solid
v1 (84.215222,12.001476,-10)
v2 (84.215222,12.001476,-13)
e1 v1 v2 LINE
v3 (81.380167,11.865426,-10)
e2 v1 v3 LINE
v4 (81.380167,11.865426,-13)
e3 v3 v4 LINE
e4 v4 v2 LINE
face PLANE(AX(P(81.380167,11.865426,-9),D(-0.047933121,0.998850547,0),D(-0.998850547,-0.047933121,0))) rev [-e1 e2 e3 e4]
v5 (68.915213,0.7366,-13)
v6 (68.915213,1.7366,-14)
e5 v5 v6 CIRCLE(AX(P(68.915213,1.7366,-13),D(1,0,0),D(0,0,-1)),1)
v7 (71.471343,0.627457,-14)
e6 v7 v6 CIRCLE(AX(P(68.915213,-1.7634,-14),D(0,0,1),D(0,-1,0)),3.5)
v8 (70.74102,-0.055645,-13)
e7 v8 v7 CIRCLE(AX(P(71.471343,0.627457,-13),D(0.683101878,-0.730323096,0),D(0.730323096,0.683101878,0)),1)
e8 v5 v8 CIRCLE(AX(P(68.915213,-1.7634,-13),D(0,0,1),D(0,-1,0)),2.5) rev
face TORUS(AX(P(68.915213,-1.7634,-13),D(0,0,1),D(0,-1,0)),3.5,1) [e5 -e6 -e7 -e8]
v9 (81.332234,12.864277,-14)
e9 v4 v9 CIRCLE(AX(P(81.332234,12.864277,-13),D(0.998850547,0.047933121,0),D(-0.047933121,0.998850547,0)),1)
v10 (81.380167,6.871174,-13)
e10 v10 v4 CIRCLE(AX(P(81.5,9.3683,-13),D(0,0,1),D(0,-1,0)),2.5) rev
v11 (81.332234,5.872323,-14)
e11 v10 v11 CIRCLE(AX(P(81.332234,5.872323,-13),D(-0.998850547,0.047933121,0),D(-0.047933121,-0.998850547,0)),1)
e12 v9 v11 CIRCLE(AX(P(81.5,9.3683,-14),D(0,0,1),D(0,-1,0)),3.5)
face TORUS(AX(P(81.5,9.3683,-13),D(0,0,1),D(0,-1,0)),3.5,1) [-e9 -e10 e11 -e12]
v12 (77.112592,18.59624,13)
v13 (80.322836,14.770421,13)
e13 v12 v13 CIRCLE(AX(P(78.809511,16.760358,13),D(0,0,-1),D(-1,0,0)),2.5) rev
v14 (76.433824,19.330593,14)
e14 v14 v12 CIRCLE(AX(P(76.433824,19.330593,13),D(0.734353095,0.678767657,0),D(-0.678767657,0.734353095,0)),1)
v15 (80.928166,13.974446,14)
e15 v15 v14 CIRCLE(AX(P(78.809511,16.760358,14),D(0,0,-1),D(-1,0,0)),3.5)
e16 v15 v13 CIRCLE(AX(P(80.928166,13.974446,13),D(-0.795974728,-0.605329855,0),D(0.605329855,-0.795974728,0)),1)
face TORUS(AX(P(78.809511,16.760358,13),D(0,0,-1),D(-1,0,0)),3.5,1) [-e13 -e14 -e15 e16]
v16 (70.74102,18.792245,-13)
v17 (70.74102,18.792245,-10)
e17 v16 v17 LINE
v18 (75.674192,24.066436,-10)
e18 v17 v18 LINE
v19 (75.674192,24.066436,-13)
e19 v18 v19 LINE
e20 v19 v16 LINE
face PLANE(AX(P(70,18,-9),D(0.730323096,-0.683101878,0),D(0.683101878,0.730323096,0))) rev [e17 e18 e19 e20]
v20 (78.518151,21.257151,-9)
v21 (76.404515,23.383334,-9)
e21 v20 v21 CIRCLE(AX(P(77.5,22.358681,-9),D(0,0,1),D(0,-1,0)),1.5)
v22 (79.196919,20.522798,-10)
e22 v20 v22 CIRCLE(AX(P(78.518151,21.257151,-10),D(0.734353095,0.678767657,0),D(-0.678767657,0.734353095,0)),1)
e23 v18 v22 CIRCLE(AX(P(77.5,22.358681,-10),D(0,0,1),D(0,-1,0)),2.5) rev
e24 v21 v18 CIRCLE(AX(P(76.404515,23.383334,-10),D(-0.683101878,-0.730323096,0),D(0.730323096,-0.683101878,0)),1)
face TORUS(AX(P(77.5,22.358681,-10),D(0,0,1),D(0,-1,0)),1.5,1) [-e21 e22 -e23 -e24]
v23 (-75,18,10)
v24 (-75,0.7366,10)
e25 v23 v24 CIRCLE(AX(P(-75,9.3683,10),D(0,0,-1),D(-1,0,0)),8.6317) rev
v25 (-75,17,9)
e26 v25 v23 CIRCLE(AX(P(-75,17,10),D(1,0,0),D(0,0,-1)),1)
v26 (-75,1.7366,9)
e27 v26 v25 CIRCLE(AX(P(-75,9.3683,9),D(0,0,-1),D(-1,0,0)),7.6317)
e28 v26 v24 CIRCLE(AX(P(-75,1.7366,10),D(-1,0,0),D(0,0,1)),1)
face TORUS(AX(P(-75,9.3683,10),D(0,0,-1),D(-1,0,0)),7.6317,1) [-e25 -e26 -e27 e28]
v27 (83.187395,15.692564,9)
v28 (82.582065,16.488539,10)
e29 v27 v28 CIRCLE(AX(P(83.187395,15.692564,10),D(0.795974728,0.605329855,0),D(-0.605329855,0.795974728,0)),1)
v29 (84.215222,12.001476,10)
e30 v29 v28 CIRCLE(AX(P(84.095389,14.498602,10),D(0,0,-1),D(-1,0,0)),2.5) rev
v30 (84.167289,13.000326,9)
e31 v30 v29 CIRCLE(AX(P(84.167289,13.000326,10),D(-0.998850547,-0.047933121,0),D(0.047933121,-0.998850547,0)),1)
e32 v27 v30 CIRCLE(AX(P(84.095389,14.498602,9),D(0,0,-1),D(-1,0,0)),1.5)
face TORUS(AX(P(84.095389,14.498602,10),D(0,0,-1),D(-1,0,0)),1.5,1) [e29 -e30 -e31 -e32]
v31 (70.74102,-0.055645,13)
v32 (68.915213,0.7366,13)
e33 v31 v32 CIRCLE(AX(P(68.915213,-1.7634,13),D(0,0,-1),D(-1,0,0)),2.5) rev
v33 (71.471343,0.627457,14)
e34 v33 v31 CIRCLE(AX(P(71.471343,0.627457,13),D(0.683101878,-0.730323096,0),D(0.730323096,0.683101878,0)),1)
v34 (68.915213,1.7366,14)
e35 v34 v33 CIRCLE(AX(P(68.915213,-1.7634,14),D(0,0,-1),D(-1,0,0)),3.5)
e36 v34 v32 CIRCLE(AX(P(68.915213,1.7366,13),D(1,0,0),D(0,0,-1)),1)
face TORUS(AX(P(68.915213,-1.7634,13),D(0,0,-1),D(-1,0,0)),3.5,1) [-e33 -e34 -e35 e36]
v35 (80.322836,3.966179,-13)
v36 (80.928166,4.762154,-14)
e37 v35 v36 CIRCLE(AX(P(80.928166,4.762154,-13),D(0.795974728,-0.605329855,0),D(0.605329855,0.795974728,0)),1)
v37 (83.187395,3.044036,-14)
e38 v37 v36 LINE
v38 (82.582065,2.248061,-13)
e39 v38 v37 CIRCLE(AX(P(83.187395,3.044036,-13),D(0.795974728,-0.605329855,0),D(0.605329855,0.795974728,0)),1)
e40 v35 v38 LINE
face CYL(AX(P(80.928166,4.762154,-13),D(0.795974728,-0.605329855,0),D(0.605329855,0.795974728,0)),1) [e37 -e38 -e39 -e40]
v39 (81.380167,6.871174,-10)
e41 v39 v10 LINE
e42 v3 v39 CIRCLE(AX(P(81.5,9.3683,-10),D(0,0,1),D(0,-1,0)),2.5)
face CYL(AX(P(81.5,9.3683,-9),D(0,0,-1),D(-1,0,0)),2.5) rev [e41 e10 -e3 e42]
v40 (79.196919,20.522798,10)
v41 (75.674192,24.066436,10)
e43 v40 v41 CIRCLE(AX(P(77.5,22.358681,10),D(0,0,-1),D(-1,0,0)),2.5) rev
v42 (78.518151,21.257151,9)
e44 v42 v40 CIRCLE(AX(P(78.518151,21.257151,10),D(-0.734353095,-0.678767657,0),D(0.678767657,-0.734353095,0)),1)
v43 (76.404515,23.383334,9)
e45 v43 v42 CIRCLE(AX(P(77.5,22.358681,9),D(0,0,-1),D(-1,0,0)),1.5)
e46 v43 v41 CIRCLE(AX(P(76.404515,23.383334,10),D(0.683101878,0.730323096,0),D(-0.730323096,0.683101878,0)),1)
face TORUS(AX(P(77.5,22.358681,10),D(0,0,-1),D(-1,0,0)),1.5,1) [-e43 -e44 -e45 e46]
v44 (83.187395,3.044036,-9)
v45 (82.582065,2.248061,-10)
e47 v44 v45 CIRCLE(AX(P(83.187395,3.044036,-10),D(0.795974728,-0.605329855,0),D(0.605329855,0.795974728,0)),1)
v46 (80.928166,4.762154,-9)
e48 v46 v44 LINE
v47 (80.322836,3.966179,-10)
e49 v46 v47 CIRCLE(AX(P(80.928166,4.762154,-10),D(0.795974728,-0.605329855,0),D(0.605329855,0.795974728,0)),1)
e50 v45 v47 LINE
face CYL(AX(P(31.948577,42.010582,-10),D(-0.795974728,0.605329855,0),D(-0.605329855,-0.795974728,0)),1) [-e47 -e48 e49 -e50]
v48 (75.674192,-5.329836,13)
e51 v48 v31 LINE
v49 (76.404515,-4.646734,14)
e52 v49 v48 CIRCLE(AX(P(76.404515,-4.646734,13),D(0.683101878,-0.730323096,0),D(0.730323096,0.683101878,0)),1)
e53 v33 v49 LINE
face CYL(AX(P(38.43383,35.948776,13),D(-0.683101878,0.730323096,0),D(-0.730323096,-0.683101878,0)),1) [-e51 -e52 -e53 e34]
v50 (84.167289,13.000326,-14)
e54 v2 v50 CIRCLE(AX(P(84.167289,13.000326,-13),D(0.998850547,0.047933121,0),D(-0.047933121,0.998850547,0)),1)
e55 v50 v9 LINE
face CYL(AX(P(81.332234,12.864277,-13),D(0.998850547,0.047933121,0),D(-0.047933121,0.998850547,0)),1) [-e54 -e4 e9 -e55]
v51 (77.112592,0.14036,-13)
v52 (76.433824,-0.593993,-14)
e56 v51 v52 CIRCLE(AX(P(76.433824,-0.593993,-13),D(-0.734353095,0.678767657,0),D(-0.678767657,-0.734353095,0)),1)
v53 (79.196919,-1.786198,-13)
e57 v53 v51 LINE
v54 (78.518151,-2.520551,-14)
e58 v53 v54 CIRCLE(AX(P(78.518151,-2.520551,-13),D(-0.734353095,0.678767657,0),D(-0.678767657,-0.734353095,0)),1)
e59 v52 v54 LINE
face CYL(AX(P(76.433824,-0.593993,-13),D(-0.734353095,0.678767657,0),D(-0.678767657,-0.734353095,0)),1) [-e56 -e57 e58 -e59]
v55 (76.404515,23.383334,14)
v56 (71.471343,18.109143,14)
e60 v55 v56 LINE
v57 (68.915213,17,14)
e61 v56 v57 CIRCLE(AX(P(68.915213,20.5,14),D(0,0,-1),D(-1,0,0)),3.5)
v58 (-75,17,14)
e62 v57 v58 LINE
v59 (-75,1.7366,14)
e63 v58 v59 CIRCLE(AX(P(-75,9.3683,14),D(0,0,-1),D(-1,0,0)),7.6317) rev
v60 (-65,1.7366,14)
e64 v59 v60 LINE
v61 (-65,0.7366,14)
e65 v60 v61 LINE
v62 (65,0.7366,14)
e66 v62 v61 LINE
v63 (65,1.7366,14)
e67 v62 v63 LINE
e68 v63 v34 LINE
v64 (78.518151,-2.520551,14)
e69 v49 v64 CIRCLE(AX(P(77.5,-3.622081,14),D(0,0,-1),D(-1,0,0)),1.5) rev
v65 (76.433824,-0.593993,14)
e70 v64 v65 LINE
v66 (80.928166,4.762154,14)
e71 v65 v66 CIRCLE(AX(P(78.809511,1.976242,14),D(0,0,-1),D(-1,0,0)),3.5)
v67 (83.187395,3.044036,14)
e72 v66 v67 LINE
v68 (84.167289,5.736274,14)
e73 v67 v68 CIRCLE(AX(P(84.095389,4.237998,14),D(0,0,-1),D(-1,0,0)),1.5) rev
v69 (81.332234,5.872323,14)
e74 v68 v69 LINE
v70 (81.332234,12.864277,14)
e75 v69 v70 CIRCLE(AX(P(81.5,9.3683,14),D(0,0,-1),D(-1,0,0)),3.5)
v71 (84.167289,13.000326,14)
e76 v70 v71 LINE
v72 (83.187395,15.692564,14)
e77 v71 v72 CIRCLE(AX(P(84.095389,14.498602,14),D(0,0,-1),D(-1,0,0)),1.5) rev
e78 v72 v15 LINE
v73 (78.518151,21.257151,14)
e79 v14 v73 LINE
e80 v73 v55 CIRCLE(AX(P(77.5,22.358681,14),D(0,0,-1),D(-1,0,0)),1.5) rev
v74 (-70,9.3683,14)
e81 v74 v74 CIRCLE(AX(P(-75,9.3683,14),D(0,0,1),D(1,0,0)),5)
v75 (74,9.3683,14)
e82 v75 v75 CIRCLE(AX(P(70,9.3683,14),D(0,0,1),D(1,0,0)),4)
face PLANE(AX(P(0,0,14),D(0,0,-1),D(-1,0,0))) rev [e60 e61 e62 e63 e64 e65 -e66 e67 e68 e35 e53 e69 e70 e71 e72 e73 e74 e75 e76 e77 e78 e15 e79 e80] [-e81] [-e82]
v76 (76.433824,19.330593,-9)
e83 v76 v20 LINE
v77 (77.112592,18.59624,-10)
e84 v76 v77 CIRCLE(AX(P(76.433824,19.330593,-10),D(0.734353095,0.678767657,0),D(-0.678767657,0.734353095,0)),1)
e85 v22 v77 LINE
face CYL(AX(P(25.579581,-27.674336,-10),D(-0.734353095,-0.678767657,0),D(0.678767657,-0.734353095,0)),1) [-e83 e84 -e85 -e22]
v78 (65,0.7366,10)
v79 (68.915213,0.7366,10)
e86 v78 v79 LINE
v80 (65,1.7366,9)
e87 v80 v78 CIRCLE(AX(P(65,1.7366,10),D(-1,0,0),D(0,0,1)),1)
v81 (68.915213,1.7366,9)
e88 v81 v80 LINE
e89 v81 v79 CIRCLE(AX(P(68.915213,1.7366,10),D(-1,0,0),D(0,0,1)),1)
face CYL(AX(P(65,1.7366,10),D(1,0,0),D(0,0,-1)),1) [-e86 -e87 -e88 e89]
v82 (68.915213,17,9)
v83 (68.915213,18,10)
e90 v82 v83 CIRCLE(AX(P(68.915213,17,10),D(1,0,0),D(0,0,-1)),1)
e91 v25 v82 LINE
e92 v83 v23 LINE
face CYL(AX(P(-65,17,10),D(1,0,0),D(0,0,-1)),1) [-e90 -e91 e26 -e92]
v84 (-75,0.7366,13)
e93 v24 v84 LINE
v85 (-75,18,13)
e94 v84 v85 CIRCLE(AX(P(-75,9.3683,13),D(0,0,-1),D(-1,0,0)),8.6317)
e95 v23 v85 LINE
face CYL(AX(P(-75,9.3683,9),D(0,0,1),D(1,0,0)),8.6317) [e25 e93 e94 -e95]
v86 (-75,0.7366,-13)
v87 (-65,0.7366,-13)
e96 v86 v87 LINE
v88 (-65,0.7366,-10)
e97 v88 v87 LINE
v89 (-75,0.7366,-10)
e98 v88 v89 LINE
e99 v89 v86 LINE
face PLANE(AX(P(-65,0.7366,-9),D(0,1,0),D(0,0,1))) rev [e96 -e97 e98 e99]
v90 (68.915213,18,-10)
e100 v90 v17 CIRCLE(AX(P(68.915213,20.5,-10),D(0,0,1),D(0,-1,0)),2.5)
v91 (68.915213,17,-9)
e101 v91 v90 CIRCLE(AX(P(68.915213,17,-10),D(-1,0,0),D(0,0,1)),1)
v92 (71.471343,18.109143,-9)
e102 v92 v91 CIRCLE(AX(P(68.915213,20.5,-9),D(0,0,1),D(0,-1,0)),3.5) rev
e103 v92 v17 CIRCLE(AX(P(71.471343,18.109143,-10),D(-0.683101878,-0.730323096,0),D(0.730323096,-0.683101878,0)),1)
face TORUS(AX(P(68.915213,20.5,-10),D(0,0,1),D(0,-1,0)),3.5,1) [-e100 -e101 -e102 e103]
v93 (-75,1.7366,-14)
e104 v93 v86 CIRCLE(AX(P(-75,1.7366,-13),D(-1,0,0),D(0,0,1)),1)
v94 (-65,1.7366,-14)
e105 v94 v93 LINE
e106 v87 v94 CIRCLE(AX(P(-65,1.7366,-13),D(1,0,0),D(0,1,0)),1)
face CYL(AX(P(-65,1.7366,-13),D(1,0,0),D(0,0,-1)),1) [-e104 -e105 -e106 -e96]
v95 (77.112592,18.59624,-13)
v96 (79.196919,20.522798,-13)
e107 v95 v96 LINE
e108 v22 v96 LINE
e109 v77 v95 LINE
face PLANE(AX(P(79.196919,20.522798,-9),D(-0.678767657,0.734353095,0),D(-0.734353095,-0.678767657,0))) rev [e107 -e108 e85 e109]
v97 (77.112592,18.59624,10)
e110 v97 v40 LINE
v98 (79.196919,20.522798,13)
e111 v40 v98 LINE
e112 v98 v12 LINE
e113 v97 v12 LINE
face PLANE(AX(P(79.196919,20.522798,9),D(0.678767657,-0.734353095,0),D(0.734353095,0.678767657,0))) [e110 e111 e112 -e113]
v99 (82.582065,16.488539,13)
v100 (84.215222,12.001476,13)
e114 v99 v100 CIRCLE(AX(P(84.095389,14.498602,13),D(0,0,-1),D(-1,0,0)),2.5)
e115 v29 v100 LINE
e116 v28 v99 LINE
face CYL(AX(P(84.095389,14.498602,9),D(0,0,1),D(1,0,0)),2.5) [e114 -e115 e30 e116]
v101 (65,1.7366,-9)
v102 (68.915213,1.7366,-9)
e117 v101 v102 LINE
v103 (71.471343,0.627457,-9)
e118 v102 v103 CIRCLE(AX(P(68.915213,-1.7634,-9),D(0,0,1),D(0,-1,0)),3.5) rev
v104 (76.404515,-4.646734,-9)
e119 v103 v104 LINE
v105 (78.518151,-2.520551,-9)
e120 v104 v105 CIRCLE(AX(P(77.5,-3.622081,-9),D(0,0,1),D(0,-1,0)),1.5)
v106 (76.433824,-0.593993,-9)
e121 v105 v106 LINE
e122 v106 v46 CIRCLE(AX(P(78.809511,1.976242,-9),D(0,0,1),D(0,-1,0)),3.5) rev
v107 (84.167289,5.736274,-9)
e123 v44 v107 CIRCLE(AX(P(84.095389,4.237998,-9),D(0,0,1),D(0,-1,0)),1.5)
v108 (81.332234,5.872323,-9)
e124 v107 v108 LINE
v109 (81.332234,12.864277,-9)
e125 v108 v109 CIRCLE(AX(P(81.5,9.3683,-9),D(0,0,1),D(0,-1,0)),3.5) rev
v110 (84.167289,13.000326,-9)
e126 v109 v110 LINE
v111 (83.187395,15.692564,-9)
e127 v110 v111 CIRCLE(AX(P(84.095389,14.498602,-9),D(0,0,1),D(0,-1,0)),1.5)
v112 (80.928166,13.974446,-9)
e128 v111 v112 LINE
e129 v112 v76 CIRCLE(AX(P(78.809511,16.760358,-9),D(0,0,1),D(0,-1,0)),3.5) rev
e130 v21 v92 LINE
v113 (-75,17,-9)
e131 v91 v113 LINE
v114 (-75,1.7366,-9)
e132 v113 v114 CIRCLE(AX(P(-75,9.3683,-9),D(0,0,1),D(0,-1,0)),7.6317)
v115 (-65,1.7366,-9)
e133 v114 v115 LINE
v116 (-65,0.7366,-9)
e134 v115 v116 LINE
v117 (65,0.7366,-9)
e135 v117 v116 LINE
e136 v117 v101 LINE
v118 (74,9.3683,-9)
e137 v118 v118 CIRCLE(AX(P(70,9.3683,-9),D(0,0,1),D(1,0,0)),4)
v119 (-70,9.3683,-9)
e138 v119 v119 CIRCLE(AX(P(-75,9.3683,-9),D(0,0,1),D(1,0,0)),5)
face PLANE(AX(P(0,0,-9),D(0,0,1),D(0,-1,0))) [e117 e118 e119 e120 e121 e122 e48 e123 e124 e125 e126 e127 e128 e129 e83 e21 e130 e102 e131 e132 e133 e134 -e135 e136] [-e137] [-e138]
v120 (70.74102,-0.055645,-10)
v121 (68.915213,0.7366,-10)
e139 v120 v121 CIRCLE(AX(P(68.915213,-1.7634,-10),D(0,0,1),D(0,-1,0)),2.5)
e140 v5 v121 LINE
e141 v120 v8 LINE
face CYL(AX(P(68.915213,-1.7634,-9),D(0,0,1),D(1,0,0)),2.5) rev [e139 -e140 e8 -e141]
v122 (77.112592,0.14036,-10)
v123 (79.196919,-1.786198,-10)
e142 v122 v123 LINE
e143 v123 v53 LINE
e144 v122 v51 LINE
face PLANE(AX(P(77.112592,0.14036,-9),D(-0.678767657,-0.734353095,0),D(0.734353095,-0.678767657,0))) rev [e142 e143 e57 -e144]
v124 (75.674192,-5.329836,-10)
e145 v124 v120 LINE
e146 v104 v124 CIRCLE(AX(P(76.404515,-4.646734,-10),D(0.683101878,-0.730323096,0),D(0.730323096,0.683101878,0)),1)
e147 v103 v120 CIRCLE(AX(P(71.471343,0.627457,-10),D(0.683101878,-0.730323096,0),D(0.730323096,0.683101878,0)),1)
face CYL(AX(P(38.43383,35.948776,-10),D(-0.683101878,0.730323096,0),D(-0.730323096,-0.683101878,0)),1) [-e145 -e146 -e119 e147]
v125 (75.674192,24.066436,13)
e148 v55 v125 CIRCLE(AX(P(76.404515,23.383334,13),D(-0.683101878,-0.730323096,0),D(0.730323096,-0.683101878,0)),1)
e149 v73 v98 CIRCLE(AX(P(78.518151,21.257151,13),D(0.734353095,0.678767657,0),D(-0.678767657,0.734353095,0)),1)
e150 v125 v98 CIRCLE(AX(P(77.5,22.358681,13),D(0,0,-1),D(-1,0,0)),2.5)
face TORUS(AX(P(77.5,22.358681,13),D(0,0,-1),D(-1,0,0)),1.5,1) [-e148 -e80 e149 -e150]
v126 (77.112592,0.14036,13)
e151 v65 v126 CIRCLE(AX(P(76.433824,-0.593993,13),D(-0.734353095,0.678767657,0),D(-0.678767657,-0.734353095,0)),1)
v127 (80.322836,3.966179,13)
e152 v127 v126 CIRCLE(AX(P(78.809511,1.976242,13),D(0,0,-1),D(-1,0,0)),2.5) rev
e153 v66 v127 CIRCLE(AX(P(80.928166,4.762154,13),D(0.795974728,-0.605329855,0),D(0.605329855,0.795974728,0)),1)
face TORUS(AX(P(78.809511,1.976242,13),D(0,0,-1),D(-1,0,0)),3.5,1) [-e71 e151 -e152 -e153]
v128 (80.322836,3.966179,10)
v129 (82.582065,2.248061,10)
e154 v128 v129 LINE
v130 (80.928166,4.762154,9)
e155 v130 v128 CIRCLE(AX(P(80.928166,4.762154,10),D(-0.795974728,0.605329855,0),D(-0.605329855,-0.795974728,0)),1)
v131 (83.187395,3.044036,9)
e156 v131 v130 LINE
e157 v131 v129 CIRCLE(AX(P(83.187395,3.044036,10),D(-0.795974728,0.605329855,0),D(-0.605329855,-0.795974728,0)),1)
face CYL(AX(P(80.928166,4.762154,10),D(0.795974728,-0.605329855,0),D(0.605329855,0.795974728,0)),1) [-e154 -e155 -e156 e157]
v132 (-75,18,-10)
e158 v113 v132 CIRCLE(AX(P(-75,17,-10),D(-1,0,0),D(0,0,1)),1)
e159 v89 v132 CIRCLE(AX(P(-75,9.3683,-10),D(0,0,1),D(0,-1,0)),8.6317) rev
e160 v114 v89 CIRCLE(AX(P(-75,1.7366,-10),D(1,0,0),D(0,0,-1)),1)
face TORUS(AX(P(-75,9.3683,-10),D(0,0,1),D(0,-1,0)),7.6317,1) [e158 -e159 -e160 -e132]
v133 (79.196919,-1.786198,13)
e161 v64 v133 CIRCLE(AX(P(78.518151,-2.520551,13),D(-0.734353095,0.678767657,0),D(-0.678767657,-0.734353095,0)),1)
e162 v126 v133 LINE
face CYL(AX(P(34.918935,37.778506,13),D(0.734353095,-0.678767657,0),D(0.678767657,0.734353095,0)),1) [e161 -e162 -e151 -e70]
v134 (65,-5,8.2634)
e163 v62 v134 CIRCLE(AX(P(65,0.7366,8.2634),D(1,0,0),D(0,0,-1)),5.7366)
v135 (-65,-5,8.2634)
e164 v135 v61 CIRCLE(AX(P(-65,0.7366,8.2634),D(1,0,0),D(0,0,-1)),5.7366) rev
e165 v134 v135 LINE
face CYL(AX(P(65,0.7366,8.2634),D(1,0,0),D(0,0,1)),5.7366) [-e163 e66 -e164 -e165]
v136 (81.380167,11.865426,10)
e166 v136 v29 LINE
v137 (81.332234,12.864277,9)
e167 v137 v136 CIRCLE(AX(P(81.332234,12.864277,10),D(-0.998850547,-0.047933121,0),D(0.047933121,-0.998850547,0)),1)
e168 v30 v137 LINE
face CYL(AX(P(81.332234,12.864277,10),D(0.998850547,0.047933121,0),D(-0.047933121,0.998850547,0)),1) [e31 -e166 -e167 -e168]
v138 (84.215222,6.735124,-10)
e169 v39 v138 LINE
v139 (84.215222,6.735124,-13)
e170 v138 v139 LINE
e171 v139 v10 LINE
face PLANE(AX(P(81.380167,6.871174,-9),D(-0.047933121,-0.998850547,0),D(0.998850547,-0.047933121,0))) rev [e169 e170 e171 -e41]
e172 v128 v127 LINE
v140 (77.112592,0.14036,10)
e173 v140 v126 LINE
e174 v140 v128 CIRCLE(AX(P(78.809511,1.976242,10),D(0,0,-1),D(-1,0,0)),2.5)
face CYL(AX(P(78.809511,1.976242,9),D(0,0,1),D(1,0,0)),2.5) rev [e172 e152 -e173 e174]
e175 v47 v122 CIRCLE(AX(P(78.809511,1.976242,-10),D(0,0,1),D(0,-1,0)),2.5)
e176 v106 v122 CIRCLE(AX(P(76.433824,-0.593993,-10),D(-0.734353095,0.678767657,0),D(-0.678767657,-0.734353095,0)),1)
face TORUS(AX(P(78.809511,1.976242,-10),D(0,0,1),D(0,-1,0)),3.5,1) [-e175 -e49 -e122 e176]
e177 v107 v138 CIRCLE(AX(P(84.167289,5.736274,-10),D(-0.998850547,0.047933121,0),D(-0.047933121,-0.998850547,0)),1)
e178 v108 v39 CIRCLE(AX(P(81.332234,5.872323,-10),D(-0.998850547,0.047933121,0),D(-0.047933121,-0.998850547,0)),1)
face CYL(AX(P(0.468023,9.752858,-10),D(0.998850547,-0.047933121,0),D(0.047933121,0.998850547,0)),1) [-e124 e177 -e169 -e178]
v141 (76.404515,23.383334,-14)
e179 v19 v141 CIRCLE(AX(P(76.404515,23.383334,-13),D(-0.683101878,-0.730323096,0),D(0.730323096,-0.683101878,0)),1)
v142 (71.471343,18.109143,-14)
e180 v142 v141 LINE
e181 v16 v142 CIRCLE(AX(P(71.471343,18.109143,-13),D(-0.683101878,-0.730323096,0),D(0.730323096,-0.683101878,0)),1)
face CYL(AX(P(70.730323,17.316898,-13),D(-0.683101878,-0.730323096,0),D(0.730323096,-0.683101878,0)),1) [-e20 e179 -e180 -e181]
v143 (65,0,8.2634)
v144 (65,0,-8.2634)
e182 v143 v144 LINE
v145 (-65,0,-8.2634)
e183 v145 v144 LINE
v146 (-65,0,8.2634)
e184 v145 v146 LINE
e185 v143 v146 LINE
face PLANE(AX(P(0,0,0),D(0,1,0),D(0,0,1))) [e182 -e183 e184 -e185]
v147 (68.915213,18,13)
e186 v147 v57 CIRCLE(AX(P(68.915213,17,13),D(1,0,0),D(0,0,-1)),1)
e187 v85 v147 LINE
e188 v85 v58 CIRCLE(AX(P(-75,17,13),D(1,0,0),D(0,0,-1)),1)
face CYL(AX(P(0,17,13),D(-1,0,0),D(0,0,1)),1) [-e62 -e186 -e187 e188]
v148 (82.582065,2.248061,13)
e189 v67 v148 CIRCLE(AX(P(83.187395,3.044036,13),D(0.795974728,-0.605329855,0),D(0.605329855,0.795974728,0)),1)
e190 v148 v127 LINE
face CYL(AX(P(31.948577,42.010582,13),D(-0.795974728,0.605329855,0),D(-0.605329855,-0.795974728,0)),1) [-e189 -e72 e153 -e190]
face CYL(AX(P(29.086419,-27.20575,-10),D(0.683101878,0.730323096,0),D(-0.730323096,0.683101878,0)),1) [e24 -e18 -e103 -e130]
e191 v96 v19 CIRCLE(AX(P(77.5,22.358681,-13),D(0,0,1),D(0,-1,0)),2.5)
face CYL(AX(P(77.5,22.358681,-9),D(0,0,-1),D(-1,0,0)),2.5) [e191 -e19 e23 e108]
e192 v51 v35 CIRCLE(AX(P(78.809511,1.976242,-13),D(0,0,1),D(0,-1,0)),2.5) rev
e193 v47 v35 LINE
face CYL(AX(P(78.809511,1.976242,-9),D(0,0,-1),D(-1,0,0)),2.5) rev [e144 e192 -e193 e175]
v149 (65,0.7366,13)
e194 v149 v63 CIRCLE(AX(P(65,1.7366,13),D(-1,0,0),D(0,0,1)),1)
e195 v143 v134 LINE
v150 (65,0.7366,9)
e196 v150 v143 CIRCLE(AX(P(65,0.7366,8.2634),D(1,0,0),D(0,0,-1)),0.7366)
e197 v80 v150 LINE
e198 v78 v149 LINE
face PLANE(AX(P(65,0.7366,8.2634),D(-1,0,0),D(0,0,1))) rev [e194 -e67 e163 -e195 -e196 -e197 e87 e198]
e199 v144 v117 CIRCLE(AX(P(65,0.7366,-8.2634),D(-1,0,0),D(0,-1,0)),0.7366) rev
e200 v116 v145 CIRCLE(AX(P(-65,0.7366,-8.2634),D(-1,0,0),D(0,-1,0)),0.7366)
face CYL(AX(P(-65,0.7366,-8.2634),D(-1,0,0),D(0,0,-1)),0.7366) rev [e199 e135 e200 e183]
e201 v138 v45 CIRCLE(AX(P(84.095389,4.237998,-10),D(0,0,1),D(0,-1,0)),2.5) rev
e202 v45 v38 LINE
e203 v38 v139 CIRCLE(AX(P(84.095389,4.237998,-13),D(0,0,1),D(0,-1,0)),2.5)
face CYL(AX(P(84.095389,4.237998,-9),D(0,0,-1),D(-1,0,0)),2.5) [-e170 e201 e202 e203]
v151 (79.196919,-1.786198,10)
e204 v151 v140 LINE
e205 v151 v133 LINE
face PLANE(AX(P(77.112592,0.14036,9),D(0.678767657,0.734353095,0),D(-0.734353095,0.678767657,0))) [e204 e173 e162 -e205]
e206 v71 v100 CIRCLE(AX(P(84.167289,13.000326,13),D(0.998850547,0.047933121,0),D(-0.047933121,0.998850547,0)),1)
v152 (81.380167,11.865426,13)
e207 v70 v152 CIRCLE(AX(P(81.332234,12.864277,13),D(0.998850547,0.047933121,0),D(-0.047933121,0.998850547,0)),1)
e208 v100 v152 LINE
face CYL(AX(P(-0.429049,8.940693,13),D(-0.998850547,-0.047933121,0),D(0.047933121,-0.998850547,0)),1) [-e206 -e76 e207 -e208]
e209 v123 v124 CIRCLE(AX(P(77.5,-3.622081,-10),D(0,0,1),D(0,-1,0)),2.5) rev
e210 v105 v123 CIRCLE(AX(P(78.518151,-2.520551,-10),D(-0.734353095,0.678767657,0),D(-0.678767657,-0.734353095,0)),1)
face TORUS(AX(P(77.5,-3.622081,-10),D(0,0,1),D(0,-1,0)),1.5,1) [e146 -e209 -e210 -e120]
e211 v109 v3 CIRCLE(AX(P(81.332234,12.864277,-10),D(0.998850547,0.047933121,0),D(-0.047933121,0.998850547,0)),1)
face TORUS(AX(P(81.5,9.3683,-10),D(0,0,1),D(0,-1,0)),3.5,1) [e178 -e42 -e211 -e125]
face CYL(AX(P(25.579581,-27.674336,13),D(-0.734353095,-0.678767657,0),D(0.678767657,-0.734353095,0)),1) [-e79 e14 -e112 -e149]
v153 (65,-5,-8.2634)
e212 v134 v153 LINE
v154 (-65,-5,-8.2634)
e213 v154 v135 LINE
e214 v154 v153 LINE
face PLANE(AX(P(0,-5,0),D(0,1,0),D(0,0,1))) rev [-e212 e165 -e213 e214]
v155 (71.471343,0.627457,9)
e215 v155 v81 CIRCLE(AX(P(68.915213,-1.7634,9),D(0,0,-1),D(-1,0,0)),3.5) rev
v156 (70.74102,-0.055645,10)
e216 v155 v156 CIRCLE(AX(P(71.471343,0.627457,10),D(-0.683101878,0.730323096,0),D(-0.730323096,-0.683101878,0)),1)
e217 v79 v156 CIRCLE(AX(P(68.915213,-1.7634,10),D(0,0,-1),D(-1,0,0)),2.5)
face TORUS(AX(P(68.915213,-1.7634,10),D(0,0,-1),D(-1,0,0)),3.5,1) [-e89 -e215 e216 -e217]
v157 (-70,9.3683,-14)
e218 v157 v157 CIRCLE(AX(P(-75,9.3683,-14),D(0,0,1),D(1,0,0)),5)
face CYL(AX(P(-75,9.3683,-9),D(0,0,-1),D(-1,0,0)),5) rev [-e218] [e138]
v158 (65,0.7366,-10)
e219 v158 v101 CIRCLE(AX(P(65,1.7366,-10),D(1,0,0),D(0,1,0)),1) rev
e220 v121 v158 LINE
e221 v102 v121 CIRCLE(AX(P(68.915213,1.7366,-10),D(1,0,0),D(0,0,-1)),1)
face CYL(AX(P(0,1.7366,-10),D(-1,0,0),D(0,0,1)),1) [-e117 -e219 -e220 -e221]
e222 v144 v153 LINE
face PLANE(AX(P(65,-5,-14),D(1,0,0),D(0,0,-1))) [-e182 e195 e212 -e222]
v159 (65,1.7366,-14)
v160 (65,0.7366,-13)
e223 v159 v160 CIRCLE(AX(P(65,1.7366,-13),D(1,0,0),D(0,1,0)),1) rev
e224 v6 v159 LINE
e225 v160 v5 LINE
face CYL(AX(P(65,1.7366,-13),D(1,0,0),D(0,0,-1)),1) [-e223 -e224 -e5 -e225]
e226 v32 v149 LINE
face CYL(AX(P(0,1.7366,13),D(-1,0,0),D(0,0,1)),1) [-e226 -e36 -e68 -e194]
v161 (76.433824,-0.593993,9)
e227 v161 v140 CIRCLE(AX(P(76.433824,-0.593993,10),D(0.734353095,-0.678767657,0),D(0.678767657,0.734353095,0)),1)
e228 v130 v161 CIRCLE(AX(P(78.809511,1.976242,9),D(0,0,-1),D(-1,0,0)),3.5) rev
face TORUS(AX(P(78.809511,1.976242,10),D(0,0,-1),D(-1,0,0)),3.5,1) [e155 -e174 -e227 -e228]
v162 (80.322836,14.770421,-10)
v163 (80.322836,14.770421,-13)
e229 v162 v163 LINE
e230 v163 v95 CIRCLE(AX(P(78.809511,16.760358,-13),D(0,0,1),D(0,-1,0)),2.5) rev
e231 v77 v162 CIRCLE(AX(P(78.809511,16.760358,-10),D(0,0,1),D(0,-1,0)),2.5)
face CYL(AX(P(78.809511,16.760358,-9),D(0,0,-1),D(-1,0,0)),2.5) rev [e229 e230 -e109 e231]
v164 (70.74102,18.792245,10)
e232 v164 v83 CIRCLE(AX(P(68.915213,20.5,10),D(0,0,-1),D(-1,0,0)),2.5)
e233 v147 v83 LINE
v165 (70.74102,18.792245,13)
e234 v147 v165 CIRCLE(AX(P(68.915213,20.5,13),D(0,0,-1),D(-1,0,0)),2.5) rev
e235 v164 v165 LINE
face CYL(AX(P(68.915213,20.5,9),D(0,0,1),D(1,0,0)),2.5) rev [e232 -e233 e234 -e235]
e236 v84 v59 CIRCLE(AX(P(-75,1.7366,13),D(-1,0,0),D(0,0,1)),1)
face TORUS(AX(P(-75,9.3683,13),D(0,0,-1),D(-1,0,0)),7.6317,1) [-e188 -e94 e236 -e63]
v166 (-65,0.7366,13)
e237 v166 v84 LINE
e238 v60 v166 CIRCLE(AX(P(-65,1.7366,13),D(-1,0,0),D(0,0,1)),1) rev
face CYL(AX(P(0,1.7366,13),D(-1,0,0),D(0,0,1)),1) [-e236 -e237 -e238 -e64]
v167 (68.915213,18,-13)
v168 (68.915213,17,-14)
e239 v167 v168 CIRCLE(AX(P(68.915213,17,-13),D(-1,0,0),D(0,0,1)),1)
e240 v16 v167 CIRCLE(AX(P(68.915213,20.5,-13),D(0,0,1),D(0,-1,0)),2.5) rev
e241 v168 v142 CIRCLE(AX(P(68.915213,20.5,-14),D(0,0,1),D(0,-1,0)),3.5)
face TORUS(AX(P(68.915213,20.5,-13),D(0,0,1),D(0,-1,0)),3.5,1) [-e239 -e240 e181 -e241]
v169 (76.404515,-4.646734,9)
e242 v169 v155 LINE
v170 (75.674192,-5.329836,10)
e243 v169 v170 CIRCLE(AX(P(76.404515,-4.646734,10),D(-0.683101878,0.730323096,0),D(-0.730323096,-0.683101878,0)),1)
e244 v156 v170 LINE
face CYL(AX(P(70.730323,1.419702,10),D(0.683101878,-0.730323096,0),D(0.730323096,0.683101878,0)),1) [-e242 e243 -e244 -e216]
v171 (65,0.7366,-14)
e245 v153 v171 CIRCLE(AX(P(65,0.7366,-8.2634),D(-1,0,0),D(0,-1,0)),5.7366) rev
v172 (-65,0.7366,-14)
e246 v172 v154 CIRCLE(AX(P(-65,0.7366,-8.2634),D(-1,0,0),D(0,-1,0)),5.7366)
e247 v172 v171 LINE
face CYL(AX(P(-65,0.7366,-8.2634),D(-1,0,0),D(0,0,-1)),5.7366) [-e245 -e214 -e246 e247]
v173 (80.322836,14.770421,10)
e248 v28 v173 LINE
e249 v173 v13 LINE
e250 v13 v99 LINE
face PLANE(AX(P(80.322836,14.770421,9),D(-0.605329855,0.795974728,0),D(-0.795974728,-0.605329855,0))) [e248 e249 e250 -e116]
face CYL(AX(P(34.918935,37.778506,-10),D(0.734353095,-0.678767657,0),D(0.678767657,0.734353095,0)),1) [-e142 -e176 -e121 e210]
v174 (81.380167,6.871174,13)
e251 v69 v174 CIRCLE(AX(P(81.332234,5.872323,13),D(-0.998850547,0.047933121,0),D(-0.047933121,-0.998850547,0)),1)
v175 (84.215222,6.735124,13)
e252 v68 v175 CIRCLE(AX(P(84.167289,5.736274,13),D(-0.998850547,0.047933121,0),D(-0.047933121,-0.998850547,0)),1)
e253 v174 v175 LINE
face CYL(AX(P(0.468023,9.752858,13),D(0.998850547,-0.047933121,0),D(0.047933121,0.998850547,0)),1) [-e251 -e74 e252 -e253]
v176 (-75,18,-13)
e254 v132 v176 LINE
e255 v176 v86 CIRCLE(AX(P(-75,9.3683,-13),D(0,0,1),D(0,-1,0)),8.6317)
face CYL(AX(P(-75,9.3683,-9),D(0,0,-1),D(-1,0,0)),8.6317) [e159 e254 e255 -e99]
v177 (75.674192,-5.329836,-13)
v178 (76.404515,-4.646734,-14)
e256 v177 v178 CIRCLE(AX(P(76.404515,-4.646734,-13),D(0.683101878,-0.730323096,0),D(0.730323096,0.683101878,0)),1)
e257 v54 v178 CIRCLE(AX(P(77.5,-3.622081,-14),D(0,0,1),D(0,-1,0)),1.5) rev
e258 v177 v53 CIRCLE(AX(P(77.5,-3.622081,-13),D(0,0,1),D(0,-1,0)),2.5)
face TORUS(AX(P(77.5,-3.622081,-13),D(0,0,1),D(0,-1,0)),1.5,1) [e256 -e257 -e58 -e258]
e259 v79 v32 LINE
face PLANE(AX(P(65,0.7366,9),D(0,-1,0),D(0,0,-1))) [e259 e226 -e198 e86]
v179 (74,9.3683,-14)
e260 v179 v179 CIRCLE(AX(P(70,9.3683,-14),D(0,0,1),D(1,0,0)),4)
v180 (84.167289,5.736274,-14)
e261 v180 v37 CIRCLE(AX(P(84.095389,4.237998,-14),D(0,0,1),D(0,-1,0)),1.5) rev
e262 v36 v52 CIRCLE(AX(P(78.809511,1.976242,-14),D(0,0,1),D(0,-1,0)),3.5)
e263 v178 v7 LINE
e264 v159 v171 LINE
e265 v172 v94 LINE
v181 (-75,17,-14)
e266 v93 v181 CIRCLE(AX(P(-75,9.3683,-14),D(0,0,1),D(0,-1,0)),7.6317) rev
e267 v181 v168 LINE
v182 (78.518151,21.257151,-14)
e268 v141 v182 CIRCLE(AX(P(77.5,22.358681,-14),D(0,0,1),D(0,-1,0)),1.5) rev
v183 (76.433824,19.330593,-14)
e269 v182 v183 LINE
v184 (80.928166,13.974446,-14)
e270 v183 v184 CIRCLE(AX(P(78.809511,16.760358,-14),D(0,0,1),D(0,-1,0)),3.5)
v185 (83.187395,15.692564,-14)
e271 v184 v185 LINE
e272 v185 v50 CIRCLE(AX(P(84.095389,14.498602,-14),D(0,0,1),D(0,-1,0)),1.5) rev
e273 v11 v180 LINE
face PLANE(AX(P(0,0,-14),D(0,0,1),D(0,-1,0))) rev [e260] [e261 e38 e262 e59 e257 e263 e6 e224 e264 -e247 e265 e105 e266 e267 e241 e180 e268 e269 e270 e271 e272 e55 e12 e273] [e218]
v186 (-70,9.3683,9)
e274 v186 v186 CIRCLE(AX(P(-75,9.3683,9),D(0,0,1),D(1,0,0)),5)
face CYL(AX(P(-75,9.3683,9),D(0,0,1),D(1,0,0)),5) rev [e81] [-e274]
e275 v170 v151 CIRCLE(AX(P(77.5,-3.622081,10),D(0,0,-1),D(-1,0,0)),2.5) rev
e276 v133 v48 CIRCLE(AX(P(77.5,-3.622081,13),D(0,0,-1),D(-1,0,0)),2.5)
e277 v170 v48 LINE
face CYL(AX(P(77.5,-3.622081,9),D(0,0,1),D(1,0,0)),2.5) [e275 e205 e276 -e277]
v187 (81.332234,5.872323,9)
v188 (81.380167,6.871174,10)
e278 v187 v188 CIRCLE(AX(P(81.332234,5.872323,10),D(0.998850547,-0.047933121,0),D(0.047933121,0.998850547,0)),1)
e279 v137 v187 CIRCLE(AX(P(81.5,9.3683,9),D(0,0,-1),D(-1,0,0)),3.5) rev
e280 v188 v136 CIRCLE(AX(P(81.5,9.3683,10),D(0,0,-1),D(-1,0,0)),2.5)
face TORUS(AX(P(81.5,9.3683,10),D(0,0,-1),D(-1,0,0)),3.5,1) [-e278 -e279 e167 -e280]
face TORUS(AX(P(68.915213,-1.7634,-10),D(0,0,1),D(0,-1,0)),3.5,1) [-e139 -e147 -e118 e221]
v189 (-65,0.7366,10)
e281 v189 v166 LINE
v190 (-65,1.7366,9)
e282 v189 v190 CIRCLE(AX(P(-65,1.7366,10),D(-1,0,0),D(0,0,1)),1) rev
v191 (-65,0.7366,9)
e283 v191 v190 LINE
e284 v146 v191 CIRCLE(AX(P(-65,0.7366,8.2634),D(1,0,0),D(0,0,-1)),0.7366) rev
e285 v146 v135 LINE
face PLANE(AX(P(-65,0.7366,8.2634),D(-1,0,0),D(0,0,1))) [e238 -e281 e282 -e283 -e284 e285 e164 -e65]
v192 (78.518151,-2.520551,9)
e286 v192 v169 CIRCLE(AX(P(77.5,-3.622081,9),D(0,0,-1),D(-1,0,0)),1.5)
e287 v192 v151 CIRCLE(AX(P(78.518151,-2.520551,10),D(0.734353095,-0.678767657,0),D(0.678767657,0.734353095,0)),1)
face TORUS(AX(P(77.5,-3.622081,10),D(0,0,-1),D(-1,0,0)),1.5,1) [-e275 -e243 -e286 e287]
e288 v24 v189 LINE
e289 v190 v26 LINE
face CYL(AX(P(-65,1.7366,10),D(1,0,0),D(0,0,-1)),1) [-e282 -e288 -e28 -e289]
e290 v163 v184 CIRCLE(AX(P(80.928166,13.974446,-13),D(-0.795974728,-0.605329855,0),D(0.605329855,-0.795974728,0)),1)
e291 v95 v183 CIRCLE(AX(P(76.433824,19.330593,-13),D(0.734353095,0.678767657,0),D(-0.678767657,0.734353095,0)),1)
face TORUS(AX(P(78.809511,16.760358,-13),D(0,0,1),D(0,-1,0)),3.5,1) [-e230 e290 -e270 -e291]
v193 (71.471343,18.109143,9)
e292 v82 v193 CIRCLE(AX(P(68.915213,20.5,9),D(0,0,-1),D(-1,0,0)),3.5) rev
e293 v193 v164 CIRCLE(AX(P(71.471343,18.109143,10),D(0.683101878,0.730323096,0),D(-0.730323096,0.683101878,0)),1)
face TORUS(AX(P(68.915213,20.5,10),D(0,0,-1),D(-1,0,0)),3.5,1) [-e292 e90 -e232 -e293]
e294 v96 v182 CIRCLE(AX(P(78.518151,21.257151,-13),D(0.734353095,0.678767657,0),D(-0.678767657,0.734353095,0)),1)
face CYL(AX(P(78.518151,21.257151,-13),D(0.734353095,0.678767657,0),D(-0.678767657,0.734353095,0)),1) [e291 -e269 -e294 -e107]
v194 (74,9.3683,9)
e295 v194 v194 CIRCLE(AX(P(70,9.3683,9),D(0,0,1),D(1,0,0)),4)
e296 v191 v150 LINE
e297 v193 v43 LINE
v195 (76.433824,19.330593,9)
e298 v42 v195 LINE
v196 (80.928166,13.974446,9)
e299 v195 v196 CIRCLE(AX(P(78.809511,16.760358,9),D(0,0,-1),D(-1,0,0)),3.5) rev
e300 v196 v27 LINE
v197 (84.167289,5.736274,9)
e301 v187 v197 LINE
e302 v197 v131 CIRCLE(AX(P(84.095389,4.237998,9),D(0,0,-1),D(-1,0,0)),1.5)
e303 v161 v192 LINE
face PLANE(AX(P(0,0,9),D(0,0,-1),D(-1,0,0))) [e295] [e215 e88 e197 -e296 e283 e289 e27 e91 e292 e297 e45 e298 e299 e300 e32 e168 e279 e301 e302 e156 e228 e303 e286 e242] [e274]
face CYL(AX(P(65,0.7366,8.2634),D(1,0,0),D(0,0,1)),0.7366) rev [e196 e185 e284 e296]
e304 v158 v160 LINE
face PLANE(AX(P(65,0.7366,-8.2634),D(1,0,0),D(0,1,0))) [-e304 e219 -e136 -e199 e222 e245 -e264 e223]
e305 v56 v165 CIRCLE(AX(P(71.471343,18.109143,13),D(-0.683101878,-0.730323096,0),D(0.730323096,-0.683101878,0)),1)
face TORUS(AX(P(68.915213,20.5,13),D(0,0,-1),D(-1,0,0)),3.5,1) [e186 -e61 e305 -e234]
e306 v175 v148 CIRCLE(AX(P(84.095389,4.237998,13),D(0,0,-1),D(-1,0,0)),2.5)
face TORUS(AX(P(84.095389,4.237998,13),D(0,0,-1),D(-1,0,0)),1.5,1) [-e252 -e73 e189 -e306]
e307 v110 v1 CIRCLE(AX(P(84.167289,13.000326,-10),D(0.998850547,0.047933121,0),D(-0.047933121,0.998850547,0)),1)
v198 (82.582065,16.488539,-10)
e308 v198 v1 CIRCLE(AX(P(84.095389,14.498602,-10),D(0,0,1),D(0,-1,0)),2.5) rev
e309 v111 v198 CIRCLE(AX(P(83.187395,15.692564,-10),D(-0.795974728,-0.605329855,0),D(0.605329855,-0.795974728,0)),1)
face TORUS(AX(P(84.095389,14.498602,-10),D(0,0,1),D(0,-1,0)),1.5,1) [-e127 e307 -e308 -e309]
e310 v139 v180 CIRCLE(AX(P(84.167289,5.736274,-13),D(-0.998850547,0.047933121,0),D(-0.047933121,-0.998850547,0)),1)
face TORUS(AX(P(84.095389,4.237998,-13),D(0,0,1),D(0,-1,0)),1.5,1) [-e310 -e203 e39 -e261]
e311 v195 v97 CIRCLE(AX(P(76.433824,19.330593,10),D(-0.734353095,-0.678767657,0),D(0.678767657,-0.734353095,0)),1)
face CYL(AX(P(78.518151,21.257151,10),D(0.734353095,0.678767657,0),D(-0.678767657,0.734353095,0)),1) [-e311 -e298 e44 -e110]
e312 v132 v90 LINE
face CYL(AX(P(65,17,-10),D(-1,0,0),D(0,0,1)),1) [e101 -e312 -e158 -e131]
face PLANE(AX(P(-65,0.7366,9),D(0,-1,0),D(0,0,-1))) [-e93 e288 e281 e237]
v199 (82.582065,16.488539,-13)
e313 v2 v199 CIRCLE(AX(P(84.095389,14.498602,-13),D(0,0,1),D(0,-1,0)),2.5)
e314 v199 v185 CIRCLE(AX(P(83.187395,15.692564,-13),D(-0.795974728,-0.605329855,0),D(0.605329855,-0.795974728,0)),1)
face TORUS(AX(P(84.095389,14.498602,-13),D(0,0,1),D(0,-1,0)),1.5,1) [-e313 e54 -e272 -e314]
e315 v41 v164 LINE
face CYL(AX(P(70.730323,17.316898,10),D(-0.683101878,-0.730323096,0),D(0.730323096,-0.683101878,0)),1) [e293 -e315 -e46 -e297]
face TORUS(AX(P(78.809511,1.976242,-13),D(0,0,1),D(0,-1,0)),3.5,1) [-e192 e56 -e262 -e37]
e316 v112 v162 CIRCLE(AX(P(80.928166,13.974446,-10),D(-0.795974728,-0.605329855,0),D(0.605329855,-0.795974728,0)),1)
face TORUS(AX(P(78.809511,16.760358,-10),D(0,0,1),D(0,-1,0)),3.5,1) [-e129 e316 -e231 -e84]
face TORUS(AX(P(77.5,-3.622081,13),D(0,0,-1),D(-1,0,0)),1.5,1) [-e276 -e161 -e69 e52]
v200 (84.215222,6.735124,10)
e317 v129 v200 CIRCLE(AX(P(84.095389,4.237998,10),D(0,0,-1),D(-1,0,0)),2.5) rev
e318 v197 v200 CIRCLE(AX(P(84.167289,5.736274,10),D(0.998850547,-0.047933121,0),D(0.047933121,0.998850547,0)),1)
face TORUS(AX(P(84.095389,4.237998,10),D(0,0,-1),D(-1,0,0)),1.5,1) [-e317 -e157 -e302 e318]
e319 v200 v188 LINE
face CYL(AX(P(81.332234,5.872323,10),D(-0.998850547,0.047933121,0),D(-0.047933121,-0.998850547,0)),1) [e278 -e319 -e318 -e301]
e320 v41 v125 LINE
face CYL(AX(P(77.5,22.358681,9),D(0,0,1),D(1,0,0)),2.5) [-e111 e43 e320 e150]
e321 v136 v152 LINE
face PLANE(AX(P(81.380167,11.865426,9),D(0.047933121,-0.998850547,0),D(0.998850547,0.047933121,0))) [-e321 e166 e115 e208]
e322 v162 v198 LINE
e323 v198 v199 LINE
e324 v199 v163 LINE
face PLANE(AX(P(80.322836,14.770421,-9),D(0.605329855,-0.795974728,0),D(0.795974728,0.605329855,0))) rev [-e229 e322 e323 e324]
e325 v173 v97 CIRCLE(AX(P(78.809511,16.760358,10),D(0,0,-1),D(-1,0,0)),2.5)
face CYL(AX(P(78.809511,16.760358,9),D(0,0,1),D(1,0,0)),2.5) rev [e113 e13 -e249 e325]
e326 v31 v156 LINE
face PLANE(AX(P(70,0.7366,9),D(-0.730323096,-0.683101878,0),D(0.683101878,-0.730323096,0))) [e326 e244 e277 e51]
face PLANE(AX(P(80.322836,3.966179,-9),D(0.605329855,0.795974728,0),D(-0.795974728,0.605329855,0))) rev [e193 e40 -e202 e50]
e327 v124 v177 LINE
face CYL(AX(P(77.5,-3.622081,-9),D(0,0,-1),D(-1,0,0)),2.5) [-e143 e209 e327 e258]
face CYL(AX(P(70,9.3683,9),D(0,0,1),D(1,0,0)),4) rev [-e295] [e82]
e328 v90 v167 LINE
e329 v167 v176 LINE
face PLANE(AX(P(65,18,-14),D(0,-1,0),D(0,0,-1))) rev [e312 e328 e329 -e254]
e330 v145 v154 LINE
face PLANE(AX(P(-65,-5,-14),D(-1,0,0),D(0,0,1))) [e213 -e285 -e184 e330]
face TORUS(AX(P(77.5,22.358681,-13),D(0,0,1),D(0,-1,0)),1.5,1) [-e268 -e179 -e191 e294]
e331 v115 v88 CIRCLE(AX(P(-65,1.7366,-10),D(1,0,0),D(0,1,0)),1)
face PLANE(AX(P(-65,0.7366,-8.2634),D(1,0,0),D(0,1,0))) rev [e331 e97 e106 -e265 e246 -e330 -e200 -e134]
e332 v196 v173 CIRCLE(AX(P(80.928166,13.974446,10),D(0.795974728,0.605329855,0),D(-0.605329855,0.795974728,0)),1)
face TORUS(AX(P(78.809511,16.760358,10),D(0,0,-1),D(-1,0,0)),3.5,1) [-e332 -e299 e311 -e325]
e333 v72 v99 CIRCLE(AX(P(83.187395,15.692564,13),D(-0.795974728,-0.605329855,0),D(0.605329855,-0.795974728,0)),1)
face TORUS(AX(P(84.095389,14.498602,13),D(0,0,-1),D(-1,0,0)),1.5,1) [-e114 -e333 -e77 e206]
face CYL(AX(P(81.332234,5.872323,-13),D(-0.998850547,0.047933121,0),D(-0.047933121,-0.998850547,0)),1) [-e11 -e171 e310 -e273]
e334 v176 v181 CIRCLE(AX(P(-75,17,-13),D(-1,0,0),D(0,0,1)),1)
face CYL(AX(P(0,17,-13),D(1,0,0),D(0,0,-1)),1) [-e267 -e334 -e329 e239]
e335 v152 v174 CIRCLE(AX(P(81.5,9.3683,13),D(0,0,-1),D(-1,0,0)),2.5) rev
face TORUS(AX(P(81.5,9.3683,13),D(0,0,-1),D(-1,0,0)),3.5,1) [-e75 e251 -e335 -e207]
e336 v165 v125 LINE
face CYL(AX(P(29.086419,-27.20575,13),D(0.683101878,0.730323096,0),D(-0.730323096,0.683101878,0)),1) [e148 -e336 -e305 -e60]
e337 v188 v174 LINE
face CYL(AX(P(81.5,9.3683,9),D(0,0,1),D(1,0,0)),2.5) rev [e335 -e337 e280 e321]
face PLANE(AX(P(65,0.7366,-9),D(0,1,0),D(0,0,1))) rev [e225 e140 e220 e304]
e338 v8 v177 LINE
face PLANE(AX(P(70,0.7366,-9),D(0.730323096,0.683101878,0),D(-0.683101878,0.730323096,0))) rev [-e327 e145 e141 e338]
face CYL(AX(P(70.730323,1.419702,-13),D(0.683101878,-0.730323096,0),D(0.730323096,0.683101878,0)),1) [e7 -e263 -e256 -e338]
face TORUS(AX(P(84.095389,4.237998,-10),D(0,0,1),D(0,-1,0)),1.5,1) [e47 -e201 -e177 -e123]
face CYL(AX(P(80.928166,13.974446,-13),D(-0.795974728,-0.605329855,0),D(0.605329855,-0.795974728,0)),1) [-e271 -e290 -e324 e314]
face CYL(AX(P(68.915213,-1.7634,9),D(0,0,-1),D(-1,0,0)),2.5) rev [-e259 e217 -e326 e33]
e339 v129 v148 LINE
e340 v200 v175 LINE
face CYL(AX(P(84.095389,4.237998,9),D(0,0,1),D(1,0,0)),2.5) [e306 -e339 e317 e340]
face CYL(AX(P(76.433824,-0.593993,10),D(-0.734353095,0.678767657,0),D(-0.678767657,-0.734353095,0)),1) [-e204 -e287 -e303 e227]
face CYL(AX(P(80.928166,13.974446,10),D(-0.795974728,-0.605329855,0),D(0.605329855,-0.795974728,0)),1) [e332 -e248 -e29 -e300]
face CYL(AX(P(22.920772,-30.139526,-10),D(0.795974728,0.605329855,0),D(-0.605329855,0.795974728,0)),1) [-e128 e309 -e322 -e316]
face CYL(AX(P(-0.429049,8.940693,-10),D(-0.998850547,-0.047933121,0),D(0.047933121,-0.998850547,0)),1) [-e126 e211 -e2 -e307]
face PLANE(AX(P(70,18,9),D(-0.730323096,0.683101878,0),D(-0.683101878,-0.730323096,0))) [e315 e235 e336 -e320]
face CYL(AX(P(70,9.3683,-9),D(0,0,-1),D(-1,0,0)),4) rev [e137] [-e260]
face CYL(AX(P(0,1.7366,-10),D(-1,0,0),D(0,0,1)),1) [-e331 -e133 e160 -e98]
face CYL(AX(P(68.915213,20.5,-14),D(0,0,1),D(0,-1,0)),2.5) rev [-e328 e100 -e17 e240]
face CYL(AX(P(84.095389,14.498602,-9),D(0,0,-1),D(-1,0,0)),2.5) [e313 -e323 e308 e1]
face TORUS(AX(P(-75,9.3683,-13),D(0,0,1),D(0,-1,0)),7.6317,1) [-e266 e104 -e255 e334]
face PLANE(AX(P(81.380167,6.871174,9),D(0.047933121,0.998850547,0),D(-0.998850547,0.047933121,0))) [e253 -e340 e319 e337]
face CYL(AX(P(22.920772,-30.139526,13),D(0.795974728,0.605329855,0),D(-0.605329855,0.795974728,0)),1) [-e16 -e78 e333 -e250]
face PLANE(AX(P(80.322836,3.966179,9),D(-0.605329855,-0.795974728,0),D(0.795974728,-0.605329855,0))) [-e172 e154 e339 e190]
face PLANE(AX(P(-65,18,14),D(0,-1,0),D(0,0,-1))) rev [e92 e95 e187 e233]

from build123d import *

# Parameters (mm, degrees)
SKETCH1_W                      = 130
SKETCH1_H                      = 28
BASE_FLANGE1_DEPTH             = 5
EDGE_FLANGE1_STRIP_W           = 21.4732
EDGE_FLANGE1_STRIP_H           = 5
EDGE_FLANGE1_STRIP_CUT_DEPTH   = 130
EDGE_FLANGE1_STRIP_2_W         = 21.4732
EDGE_FLANGE1_STRIP_2_H         = 5
EDGE_FLANGE1_STRIP_CUT_2_DEPTH = 130
EDGE_FLANGE1_DEPTH             = 130
EDGE_FLANGE1_BEND_DEPTH        = 130
SKETCH15_R                     = 5
BOSS_EXTRUDE1_DEPTH            = 5
BOSS_EXTRUDE2_DEPTH            = 5
SKETCH17_R                     = 4
CUT_EXTRUDE2_DEPTH             = 5
FILLET3_R                      = 2.5
FILLET4_R                      = 1


# Sheet-metal steps are written as plain solids
with BuildPart() as part:
    # Sketch1 → Base-Flange1 (new body)
    with BuildSketch(Plane(origin=(0, 0, 0), x_dir=(1, 0, 0), z_dir=(0, 1, 0))):
        Rectangle(SKETCH1_W, SKETCH1_H)
    extrude(amount=-BASE_FLANGE1_DEPTH)

    # Edge-Flange1 strip (across the edge) → Edge-Flange1 strip cut (cut)
    with BuildSketch(Plane(origin=(-65, 0, 14), x_dir=(0, 0, -1), z_dir=(1, 0, 0))):
        with Locations((-5, -2.5)):
            Rectangle(EDGE_FLANGE1_STRIP_W, EDGE_FLANGE1_STRIP_H)
    extrude(amount=EDGE_FLANGE1_STRIP_CUT_DEPTH, mode=Mode.SUBTRACT)

    # Edge-Flange1 strip 2 (across the edge) → Edge-Flange1 strip cut 2 (cut)
    with BuildSketch(Plane(origin=(65, 0, -14), x_dir=(0, 0, 1), z_dir=(-1, 0, 0))):
        with Locations((-5, -2.5)):
            Rectangle(EDGE_FLANGE1_STRIP_2_W, EDGE_FLANGE1_STRIP_2_H)
    extrude(amount=EDGE_FLANGE1_STRIP_CUT_2_DEPTH, mode=Mode.SUBTRACT)

    # Edge-Flange1 section (across the edge) → Edge-Flange1 (add)
    with BuildSketch(Plane(origin=(-65, 0, 14), x_dir=(0, 0, -1), z_dir=(1, 0, 0))):
        with BuildLine():
            Line((0, 0.7366), (0, 18))
            Line((0, 18), (5, 18))
            Line((5, 18), (5, 0.7366))
            ThreePointArc((5, 0.7366), (5.215745145, 0.215745145), (5.7366, 0))
            Line((5.7366, 0), (5.7366, -5))
            ThreePointArc((5.7366, -5), (1.680211239, -3.319788761), (0, 0.7366))
        make_face()
    extrude(amount=EDGE_FLANGE1_DEPTH)

    # Edge-Flange1 section 2 (across the edge) → Edge-Flange1 bend (add)
    with BuildSketch(Plane(origin=(65, 0, -14), x_dir=(0, 0, 1), z_dir=(-1, 0, 0))):
        with BuildLine():
            Line((0, 0.7366), (0, 18))
            Line((0, 18), (5, 18))
            Line((5, 18), (5, 0.7366))
            ThreePointArc((5, 0.7366), (5.215745145, 0.215745145), (5.7366, 0))
            Line((5.7366, 0), (5.7366, -5))
            ThreePointArc((5.7366, -5), (1.680211239, -3.319788761), (0, 0.7366))
        make_face()
    extrude(amount=EDGE_FLANGE1_BEND_DEPTH)

    # Sketch15 → Boss-Extrude1 (add)
    with BuildSketch(Plane.XY.offset(14)):
        with BuildLine():
            Line((-75, 18), (-65, 18))
            Line((-65, 18), (-65, 0.7366))
            Line((-65, 0.7366), (-75, 0.7366))
            ThreePointArc((-75, 0.7366), (-83.6317, 9.3683), (-75, 18))
        make_face()
        with Locations((-75, 9.3683)):
            Circle(SKETCH15_R, mode=Mode.SUBTRACT)
    boss_extrude1 = extrude(amount=-BOSS_EXTRUDE1_DEPTH)

    # Mirror3: Boss-Extrude1 across plane
    add(boss_extrude1.mirror(Plane.XY))

    # Sketch16 → Boss-Extrude2 (add)
    with BuildSketch(Plane.XY.offset(14)):
        with BuildLine():
            Line((65, 18), (70, 18))
            Line((70, 18), (75.674192261, 24.066435752))
            ThreePointArc((75.674192261, 24.066435752), (79.272990308, 24.121209175), (79.196919142, 20.52279832))
            Line((79.196919142, 20.52279832), (77.112591954, 18.596240249))
            ThreePointArc((77.112591954, 18.596240249), (76.894399988, 15.153388487), (80.322835732, 14.770420692))
            Line((80.322835732, 14.770420692), (82.582064675, 16.488538969))
            ThreePointArc((82.582064675, 16.488538969), (86.444620864, 15.353652508), (84.215222115, 12.001475782))
            Line((84.215222115, 12.001475782), (81.380167197, 11.865426368))
            ThreePointArc((81.380167197, 11.865426368), (79, 9.3683), (81.380167197, 6.871173632))
            Line((81.380167197, 6.871173632), (84.215222115, 6.735124218))
            ThreePointArc((84.215222115, 6.735124218), (86.444620864, 3.382947492), (82.582064675, 2.248061031))
            Line((82.582064675, 2.248061031), (80.322835732, 3.966179308))
            ThreePointArc((80.322835732, 3.966179308), (76.894399988, 3.583211513), (77.112591954, 0.140359751))
            Line((77.112591954, 0.140359751), (79.196919142, -1.78619832))
            ThreePointArc((79.196919142, -1.78619832), (79.272990308, -5.384609175), (75.674192261, -5.329835752))
            Line((75.674192261, -5.329835752), (70, 0.7366))
            Line((70, 0.7366), (65, 0.7366))
            Line((65, 0.7366), (65, 18))
        make_face()
    boss_extrude2 = extrude(amount=-BOSS_EXTRUDE2_DEPTH)

    # Sketch17 → Cut-Extrude2 (cut)
    with BuildSketch(Plane.XY.offset(14)):
        with Locations((70, 9.3683)):
            Circle(SKETCH17_R)
    cut_extrude2 = extrude(amount=-CUT_EXTRUDE2_DEPTH, mode=Mode.SUBTRACT)

    # Mirror5: Boss-Extrude2, Cut-Extrude2 across plane
    add(boss_extrude2.mirror(Plane.XY))
    add(cut_extrude2.mirror(Plane.XY), mode=Mode.SUBTRACT)

    # Fillet3
    fillet3_edges = [part.edges().sort_by_distance(p)[0] for p in [
        (70, 0.7366, 11.5),
        (70, 18, 11.5),
        (70, 0.7366, -11.5),
        (70, 18, -11.5),
    ]]
    fillet(fillet3_edges, radius=FILLET3_R)

    # Fillet4
    fillet4_edges = [part.edges().sort_by_distance(p)[0] for p in [
        (66.957606292, 0.7366, 9),
        (73.207606292, 21.429340528, 9),
        (79.272990308, 24.121209175, 9),
        (78.154755548, 19.559519284, 9),
        (76.894399988, 15.153388487, 9),
        (81.452450204, 15.629479831, 9),
        (86.444620864, 15.353652508, 9),
        (82.797694656, 11.933451075, 9),
        (79, 9.3683, 9),
        (82.797694656, 6.803148925, 9),
        (86.444620864, 3.382947492, 9),
        (81.452450204, 3.107120169, 9),
        (76.894399988, 3.583211513, 9),
        (78.154755548, -0.822919284, 9),
        (79.272990308, -5.384609175, 9),
        (79.272990308, -5.384609175, 14),
        (78.154755548, -0.822919284, 14),
        (76.894399988, 3.583211513, 14),
        (81.452450204, 3.107120169, 14),
        (86.444620864, 3.382947492, 14),
        (82.797694656, 6.803148925, 14),
        (79, 9.3683, 14),
        (82.797694656, 11.933451075, 14),
        (86.444620864, 15.353652508, 14),
        (81.452450204, 15.629479831, 14),
        (76.894399988, 15.153388487, 14),
        (78.154755548, 19.559519284, 14),
        (79.272990308, 24.121209175, 14),
        (73.207606292, 21.429340528, 14),
        (66.957606292, 0.7366, 14),
        (79.272990308, -5.384609175, -14),
        (78.154755548, -0.822919284, -14),
        (76.894399988, 3.583211513, -14),
        (81.452450204, 3.107120169, -14),
        (86.444620864, 3.382947492, -14),
        (82.797694656, 6.803148925, -14),
        (79, 9.3683, -14),
        (82.797694656, 11.933451075, -14),
        (86.444620864, 15.353652508, -14),
        (81.452450204, 15.629479831, -14),
        (76.894399988, 15.153388487, -14),
        (78.154755548, 19.559519284, -14),
        (79.272990308, 24.121209175, -14),
        (73.207606292, 21.429340528, -14),
        (66.957606292, 0.7366, -14),
        (79.272990308, -5.384609175, -9),
        (78.154755548, -0.822919284, -9),
        (76.894399988, 3.583211513, -9),
        (81.452450204, 3.107120169, -9),
        (86.444620864, 3.382947492, -9),
        (82.797694656, 6.803148925, -9),
        (79, 9.3683, -9),
        (82.797694656, 11.933451075, -9),
        (86.444620864, 15.353652508, -9),
        (81.452450204, 15.629479831, -9),
        (76.894399988, 15.153388487, -9),
        (78.154755548, 19.559519284, -9),
        (79.272990308, 24.121209175, -9),
        (73.207606292, 21.429340528, -9),
        (66.957606292, 0.7366, -9),
        (-3.042393708, 18, 9),
        (-3.042393708, 18, 14),
        (73.207606292, -2.692740528, 14),
        (73.207606292, -2.692740528, 9),
        (73.207606292, -2.692740528, -14),
        (73.207606292, -2.692740528, -9),
        (69.910354096, 18.206597861, 14),
        (69.910354096, 18.206597861, 9),
        (69.910354096, 0.530002139, 14),
        (69.910354096, 0.530002139, 9),
        (69.910354096, 0.530002139, -14),
        (69.910354096, 0.530002139, -9),
        (69.910354096, 18.206597861, -14),
        (69.910354096, 18.206597861, -9),
        (-3.042393708, 18, -14),
        (-3.042393708, 18, -9),
        (-70, 0.7366, 9),
        (-83.6317, 9.3683, 9),
        (-70, 0.7366, 14),
        (-83.6317, 9.3683, 14),
        (-70, 0.7366, -9),
        (-83.6317, 9.3683, -9),
        (-70, 0.7366, -14),
        (-83.6317, 9.3683, -14),
    ]]
    fillet(fillet4_edges, radius=FILLET4_R)


solid = part.part
